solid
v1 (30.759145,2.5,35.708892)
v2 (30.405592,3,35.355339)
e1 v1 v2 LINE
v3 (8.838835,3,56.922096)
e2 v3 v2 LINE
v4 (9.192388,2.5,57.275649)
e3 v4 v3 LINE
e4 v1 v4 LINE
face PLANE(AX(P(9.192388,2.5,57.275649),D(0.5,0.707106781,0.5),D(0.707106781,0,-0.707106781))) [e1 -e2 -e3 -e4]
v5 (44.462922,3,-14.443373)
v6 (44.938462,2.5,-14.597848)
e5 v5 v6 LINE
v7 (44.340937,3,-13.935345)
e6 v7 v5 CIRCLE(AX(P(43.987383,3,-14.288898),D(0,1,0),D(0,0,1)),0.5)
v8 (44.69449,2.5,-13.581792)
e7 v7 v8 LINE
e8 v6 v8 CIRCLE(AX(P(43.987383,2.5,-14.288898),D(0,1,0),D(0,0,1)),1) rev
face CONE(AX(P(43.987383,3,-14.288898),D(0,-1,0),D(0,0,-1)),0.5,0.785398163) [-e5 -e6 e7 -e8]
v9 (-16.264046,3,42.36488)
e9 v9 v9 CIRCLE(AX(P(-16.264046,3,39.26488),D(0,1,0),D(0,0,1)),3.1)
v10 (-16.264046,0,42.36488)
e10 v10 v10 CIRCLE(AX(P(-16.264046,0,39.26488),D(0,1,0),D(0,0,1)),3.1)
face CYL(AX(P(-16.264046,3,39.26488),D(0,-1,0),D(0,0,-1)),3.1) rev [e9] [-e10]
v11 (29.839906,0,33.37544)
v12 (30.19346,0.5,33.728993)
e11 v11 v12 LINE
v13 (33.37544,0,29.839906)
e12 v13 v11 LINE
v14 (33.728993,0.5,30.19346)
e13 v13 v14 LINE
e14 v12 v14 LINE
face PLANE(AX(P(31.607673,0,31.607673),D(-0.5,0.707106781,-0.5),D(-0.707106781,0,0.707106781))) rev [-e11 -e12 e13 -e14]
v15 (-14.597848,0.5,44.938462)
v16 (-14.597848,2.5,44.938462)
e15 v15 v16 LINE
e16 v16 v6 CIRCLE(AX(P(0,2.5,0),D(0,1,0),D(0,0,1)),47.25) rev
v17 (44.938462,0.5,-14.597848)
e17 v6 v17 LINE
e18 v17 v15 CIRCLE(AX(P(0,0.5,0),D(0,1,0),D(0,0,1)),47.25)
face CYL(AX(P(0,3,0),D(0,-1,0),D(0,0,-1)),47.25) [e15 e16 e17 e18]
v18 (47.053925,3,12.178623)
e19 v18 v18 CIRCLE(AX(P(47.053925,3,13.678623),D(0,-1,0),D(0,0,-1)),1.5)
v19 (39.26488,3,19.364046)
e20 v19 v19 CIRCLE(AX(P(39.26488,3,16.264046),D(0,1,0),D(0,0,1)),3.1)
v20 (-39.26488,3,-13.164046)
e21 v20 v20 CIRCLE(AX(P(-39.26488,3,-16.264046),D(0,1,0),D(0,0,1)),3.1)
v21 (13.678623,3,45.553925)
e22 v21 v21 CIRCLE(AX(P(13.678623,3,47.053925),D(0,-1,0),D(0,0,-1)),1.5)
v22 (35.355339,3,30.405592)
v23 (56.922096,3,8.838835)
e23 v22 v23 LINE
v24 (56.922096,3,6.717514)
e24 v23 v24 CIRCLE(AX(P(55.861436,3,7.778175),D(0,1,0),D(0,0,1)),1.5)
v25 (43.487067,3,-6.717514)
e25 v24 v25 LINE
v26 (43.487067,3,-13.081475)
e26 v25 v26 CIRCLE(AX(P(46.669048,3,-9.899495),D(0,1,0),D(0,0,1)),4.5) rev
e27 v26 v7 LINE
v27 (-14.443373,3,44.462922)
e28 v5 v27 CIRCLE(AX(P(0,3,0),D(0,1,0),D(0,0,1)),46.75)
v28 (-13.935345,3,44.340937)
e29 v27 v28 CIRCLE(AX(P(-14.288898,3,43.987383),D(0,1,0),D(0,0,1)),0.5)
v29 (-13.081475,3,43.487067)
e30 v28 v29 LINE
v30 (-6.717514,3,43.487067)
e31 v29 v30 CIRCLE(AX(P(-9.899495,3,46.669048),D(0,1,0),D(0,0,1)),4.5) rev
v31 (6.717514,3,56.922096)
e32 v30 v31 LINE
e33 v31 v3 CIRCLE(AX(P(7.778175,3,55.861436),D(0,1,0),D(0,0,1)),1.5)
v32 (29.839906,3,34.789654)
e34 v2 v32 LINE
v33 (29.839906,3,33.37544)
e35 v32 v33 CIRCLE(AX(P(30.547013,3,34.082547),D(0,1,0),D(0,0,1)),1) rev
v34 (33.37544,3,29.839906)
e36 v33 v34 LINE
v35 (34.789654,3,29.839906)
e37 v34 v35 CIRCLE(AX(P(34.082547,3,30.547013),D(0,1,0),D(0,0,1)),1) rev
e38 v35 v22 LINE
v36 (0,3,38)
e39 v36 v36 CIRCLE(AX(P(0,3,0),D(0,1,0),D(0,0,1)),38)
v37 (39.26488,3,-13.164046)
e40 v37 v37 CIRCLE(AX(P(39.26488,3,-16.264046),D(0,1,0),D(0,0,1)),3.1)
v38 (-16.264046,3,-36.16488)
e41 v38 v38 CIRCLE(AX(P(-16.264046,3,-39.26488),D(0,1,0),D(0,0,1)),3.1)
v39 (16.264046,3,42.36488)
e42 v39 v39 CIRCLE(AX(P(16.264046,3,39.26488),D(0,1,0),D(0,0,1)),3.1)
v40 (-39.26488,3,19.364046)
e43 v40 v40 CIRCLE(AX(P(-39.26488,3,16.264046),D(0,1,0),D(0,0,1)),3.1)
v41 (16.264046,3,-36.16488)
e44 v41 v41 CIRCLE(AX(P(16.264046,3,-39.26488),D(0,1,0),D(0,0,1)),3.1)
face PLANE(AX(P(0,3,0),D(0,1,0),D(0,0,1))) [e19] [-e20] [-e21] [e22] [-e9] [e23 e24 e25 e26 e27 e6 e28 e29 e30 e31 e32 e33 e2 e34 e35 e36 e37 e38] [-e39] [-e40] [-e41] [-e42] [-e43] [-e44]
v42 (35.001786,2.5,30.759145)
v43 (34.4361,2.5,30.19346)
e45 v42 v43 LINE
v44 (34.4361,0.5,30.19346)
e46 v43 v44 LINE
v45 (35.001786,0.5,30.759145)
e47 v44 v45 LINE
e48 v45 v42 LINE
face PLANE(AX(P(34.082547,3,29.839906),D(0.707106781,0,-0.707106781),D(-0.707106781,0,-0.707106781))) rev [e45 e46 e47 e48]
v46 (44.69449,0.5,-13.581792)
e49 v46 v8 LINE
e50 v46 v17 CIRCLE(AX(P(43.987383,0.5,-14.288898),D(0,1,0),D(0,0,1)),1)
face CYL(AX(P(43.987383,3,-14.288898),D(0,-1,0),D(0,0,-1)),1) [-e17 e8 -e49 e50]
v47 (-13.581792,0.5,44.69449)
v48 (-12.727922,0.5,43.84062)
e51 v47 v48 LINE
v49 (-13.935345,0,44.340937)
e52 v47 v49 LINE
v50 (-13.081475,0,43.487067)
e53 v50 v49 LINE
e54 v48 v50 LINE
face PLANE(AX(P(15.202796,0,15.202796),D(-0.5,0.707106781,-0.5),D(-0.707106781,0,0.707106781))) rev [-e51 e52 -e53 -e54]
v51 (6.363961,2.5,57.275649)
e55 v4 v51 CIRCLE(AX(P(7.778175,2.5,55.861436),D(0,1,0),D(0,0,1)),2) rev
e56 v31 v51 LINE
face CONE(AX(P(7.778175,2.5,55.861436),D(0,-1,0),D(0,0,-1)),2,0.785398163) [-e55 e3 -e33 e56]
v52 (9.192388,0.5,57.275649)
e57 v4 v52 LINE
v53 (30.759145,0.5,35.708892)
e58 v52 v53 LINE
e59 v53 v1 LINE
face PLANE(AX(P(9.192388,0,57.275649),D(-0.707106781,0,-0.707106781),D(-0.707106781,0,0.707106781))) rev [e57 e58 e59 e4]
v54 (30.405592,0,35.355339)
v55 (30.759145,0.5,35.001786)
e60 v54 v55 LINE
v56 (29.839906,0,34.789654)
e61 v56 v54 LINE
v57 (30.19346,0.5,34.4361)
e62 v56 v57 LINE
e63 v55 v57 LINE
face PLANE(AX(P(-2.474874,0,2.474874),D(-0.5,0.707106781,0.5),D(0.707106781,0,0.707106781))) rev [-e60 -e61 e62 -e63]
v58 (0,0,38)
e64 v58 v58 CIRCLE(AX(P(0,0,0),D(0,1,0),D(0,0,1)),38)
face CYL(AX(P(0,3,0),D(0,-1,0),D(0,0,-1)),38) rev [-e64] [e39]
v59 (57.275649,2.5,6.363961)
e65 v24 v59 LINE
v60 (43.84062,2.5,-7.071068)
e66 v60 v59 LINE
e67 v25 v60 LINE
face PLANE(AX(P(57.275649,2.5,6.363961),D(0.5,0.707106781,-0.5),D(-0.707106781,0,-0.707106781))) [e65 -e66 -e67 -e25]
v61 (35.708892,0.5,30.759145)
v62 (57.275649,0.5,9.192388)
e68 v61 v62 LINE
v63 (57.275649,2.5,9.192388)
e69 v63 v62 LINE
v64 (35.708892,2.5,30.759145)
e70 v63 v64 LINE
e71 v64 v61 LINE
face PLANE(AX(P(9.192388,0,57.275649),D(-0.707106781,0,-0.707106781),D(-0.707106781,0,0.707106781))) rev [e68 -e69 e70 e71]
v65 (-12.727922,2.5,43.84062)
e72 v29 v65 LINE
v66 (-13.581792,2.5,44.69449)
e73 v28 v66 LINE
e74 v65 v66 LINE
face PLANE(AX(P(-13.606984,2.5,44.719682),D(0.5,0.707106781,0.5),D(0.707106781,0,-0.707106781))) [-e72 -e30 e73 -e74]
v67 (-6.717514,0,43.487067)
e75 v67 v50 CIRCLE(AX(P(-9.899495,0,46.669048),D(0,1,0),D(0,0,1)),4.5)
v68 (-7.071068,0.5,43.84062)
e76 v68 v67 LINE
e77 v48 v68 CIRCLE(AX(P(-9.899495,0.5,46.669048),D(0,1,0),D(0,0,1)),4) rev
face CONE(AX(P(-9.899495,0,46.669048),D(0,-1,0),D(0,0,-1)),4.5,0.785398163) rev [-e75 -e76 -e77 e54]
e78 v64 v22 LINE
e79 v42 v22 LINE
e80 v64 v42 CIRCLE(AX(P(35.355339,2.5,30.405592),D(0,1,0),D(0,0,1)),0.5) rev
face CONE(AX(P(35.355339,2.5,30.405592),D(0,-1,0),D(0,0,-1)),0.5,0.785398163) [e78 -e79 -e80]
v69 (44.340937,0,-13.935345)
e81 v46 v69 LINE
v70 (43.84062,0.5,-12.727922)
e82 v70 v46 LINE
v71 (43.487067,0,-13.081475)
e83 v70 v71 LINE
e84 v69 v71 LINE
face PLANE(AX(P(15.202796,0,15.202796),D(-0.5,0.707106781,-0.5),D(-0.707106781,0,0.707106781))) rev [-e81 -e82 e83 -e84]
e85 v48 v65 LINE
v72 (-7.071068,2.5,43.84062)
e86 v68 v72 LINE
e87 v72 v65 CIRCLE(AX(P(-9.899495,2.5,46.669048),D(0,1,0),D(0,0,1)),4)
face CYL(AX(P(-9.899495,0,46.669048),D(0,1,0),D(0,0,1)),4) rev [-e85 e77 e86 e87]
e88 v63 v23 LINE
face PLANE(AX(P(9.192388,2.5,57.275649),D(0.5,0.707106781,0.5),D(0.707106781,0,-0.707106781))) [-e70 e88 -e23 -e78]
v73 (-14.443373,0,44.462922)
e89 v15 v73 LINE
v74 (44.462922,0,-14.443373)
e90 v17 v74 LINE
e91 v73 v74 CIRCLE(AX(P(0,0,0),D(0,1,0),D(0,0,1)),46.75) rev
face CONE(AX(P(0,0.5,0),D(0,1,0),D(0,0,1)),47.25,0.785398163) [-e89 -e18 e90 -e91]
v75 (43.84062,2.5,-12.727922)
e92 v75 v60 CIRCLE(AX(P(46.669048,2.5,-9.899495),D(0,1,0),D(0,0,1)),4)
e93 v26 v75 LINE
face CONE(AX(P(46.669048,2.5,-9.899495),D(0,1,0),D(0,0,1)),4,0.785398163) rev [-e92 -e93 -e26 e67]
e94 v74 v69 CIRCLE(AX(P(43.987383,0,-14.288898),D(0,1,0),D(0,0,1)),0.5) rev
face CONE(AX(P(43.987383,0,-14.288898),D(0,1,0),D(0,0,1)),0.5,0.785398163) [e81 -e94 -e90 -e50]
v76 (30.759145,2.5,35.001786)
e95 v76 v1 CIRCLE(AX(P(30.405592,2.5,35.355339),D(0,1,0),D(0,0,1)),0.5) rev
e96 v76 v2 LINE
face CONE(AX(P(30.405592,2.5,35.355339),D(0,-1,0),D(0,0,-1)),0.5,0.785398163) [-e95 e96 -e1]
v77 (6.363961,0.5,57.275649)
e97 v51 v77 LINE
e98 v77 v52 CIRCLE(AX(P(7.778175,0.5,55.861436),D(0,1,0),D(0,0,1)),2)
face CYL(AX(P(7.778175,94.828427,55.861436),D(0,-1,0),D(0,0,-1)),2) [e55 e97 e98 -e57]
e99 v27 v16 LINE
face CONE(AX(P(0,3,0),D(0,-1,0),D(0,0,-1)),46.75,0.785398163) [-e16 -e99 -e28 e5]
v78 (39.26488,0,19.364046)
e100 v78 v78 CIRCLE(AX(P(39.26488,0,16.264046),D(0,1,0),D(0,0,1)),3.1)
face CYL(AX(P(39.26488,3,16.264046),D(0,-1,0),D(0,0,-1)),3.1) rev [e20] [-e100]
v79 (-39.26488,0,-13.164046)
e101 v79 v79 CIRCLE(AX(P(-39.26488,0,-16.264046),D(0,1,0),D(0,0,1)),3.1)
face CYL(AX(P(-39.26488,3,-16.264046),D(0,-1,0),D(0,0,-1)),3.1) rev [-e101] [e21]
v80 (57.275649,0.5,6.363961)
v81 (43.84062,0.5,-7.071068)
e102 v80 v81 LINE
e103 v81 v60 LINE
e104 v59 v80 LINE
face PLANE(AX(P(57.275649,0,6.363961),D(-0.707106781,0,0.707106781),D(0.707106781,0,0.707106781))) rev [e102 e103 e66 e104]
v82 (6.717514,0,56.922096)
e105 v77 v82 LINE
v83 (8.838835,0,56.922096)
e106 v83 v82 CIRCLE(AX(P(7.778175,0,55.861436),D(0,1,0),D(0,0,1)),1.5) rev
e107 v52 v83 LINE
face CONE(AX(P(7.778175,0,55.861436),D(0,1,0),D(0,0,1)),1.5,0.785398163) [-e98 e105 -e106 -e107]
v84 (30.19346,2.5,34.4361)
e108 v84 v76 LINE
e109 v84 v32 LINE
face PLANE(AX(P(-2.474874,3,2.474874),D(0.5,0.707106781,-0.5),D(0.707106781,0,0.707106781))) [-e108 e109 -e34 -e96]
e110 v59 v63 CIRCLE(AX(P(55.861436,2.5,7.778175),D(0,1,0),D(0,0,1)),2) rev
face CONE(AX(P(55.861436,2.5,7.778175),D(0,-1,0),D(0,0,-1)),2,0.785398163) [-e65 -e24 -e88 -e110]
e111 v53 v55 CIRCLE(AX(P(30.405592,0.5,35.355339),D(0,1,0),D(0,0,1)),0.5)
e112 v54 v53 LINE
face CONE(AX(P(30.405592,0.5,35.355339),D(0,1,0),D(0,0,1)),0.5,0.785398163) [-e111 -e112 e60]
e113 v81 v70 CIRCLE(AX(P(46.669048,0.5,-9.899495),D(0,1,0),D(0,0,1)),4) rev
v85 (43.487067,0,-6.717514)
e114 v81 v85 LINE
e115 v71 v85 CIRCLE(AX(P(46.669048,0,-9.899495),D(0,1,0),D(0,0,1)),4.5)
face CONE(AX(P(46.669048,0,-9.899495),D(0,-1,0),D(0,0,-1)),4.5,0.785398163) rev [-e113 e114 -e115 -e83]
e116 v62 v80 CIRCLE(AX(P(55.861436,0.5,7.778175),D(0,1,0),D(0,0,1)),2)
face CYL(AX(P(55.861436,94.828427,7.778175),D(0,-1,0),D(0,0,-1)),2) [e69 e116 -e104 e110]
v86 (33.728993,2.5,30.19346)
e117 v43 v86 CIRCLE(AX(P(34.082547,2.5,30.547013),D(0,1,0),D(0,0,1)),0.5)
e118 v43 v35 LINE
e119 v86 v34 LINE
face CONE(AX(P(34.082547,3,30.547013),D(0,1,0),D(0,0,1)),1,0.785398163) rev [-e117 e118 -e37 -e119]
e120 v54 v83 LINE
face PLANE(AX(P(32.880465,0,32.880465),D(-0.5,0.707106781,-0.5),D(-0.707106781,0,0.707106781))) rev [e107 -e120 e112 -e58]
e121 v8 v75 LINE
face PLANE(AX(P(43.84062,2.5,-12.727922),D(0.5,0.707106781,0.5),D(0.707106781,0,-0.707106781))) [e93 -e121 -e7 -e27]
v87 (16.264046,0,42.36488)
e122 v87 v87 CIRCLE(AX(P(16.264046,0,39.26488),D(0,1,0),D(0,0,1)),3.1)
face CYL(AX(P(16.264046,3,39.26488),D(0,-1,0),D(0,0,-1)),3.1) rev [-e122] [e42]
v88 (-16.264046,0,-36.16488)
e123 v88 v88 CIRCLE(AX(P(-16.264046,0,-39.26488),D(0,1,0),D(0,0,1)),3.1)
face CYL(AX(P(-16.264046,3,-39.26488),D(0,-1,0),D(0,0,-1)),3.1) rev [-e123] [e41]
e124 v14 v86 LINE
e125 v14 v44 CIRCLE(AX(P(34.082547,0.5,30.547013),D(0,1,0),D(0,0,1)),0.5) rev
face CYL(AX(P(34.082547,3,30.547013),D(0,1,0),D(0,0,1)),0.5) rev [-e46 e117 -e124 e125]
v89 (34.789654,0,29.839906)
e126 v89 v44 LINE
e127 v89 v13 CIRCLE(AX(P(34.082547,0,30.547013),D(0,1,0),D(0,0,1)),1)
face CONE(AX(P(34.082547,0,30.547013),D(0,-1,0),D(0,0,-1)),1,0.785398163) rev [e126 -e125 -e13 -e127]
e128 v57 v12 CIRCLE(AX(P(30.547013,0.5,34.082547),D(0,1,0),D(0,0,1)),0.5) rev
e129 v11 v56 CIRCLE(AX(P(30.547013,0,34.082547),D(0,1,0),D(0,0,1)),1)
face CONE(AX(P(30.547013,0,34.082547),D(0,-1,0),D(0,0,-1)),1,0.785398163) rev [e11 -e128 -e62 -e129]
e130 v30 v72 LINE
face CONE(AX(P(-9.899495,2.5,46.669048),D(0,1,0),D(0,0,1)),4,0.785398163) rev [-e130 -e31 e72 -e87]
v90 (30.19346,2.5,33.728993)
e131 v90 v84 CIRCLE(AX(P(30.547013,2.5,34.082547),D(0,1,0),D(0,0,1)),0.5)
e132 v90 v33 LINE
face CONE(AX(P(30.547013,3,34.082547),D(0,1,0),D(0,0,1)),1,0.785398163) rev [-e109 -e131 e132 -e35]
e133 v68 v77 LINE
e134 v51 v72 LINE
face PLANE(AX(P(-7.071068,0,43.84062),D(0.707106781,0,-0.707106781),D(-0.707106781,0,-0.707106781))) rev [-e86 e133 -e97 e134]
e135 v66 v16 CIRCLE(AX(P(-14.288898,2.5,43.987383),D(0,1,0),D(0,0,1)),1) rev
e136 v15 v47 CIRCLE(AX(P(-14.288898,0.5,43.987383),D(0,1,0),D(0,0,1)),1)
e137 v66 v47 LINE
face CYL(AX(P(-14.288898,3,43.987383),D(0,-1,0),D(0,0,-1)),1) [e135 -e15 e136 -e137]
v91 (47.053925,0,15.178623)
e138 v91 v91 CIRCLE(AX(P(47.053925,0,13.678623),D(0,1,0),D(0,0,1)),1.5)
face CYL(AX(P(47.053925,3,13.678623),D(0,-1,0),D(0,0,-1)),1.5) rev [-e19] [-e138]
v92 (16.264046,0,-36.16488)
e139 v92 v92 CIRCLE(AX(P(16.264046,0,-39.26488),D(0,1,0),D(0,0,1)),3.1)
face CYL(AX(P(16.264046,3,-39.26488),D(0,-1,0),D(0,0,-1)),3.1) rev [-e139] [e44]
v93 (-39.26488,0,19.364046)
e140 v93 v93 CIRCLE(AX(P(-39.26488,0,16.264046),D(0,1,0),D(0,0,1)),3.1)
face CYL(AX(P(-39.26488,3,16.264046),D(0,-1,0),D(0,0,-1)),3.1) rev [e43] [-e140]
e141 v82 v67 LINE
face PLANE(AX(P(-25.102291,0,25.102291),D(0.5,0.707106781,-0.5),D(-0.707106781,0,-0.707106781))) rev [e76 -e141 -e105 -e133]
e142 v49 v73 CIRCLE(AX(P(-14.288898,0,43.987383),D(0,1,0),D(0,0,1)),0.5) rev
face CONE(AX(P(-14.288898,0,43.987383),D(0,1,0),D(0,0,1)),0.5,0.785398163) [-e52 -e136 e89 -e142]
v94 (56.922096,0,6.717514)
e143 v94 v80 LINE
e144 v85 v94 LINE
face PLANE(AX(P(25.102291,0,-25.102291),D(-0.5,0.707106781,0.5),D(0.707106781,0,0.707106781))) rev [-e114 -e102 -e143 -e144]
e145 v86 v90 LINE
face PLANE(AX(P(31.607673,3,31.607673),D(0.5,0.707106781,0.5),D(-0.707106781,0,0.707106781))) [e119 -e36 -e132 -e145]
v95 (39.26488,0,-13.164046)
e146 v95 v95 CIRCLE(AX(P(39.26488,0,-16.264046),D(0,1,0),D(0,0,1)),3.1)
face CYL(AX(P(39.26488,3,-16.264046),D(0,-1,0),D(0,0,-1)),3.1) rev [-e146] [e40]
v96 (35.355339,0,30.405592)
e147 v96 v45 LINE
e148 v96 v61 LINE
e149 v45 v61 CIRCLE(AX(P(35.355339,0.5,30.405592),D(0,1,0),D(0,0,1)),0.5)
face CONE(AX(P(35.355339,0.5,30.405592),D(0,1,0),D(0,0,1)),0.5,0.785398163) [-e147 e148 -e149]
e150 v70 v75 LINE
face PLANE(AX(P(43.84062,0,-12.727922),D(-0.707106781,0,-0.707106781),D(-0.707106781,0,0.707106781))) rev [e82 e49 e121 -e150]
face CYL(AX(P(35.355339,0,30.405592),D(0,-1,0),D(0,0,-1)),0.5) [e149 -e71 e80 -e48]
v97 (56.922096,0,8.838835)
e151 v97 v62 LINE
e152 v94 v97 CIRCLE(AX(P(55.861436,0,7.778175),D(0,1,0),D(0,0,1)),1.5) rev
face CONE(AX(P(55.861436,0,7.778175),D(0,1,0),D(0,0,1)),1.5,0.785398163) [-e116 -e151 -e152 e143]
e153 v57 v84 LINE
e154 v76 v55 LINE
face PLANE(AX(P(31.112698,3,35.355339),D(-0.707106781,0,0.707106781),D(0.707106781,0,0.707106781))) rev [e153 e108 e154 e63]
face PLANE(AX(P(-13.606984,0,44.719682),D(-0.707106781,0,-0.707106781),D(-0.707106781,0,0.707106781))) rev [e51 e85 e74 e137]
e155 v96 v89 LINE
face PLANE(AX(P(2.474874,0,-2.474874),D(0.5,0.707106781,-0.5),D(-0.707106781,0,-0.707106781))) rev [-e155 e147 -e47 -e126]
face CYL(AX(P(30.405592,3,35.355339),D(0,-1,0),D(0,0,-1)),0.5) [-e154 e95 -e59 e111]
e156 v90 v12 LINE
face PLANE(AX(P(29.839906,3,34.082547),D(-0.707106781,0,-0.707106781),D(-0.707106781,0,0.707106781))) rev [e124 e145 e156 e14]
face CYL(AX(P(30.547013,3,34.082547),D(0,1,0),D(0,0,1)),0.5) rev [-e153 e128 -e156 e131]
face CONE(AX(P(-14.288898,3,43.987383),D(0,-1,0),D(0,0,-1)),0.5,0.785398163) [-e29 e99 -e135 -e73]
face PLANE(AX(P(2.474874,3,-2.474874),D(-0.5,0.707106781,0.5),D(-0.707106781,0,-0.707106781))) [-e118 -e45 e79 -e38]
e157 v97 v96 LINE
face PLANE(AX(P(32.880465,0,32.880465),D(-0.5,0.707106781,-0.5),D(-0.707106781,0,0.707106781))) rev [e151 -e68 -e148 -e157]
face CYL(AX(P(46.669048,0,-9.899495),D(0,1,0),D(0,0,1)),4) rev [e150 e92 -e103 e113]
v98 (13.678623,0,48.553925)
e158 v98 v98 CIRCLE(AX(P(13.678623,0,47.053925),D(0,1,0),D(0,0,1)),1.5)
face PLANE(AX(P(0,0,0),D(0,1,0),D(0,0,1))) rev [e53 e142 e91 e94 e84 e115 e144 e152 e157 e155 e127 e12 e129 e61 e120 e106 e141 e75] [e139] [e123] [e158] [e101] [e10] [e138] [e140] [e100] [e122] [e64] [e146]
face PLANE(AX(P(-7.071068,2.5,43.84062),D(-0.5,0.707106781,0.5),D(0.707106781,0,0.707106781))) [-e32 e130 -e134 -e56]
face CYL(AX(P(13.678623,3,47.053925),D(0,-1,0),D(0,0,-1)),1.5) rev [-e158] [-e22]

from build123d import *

# Parameters (mm, degrees)
SKETCH_1_R               = 47.25
SKETCH_1_R_2             = 38
SKETCH_1_R_3             = 3.1
EXTRUDE_1_DEPTH          = 3
CUT_EXTRUDE_1_DEPTH      = 67.888900425
CUT_EXTRUDE_1_DEPTH_BACK = 67.888900425
EXTRUDE_2_DEPTH          = 3
FILLET_1_R               = 1
CUT_EXTRUDE_2_DEPTH      = 82.883401917
CUT_EXTRUDE_2_DEPTH_BACK = 82.883401917
FILLET_2_R               = 0.5
CHAMFER_1_SIZE           = 0.5
CUT_EXTRUDE_3_DEPTH      = 82.883401775
CUT_EXTRUDE_3_DEPTH_BACK = 82.883401775
SKETCH_7_R               = 1.5
CUT_EXTRUDE_4_DEPTH      = 82.883401775
CUT_EXTRUDE_4_DEPTH_BACK = 82.883401775
SKETCH_8_R               = 1.5


with BuildPart() as part:
    # 草图1 → 凸台-拉伸1 (new body)
    with BuildSketch(Plane(origin=(0, 0, 0), x_dir=(1, 0, 0), z_dir=(0, 1, 0))):
        with Locations(Location((0, 0, 0), (0, 0, 270))):
            Circle(SKETCH_1_R)
        with Locations(Location((0, 0, 0), (0, 0, 270))):
            Circle(SKETCH_1_R_2, mode=Mode.SUBTRACT)
        with Locations(Location((-16.264045876, 39.264880132, 0), (0, 0, 270))):
            Circle(SKETCH_1_R_3, mode=Mode.SUBTRACT)
        with Locations(Location((16.264045876, 39.264880132, 0), (0, 0, 270))):
            Circle(SKETCH_1_R_3, mode=Mode.SUBTRACT)
        with Locations(Location((39.264880132, 16.264045876, 0), (0, 0, 270))):
            Circle(SKETCH_1_R_3, mode=Mode.SUBTRACT)
        with Locations(Location((39.264880132, -16.264045876, 0), (0, 0, 270))):
            Circle(SKETCH_1_R_3, mode=Mode.SUBTRACT)
        with Locations(Location((16.264045876, -39.264880132, 0), (0, 0, 270))):
            Circle(SKETCH_1_R_3, mode=Mode.SUBTRACT)
        with Locations(Location((-16.264045876, -39.264880132, 0), (0, 0, 270))):
            Circle(SKETCH_1_R_3, mode=Mode.SUBTRACT)
        with Locations(Location((-39.264880132, -16.264045876, 0), (0, 0, 270))):
            Circle(SKETCH_1_R_3, mode=Mode.SUBTRACT)
        with Locations(Location((-39.264880132, 16.264045876, 0), (0, 0, 270))):
            Circle(SKETCH_1_R_3, mode=Mode.SUBTRACT)
    extrude(amount=EXTRUDE_1_DEPTH)

    # 草图4 → 切除-拉伸1 (cut, two sides: drawn at the far end of the back side and taken through both)
    with BuildSketch(Plane(origin=(0, 3, 0), x_dir=(1, 0, 0), z_dir=(0, 1, 0)).offset(-CUT_EXTRUDE_1_DEPTH_BACK)):
        with BuildLine():
            Line((43.840620434, 12.727922061), (44.719682329, 13.606983957))
            ThreePointArc((44.719682329, 13.606983957), (45.806880456, 15.618172507), (45.614922333, 17.896336511))
            Line((45.614922333, 17.896336511), (84.379499133, 11.829199362))
            Line((84.379499133, 11.829199362), (6.001901693, -69.182953765))
            Line((6.001901693, -69.182953765), (-17.896336511, -45.614922333))
            ThreePointArc((-17.896336511, -45.614922333), (-15.618172507, -45.806880456), (-13.606983957, -44.719682329))
            Line((-13.606983957, -44.719682329), (-12.727922061, -43.840620434))
            ThreePointArc((-12.727922061, -43.840620434), (-9.899494937, -42.669047558), (-7.071067812, -43.840620434))
            Line((-7.071067812, -43.840620434), (6.363961031, -57.275649276))
            ThreePointArc((6.363961031, -57.275649276), (7.778174593, -57.861435714), (9.192388155, -57.275649276))
            Line((9.192388155, -57.275649276), (57.275649276, -9.192388155))
            ThreePointArc((57.275649276, -9.192388155), (57.861435714, -7.778174593), (57.275649276, -6.363961031))
            Line((57.275649276, -6.363961031), (43.840620434, 7.071067812))
            ThreePointArc((43.840620434, 7.071067812), (42.669047558, 9.899494937), (43.840620434, 12.727922061))
        make_face()
    extrude(amount=CUT_EXTRUDE_1_DEPTH + CUT_EXTRUDE_1_DEPTH_BACK, mode=Mode.SUBTRACT)

    # 草图5 → 凸台-拉伸2 (add)
    with BuildSketch(Plane.XZ):
        with BuildLine():
            Line((57.275649276, 6.363961031), (43.840620434, -7.071067812))
            ThreePointArc((43.840620434, -7.071067812), (33.021886933, 33.021886933), (-7.071067812, 43.840620434))
            Line((-7.071067812, 43.840620434), (6.363961031, 57.275649276))
            ThreePointArc((6.363961031, 57.275649276), (7.778174593, 57.861435714), (9.192388155, 57.275649276))
            Line((9.192388155, 57.275649276), (57.275649276, 9.192388155))
            ThreePointArc((57.275649276, 9.192388155), (57.861435714, 7.778174593), (57.275649276, 6.363961031))
        make_face()
    extrude(amount=-EXTRUDE_2_DEPTH)

    # 圆角1
    fillet_1_edges = [part.edges().sort_by_distance(p)[0] for p in [
        (45.109607697, 1.5, -14.060078003),
        (-14.060078003, 1.5, 45.109607697),
    ]]
    fillet(fillet_1_edges, radius=FILLET_1_R)

    # 草图6 → 切除-拉伸2 (cut, two sides: drawn at the far end of the back side and taken through both)
    with BuildSketch(Plane.XZ.offset(-CUT_EXTRUDE_2_DEPTH_BACK)):
        Polygon((29.839906166, 34.082546853), (34.082546853, 29.839906166), (35.355339059, 31.112698372), (31.112698372, 35.355339059), align=None)
    extrude(amount=CUT_EXTRUDE_2_DEPTH + CUT_EXTRUDE_2_DEPTH_BACK, mode=Mode.SUBTRACT)

    # 圆角2
    fillet_2_edges = [part.edges().sort_by_distance(p)[0] for p in [
        (34.082546853, 1.5, 29.839906166),
        (31.112698372, 1.5, 35.355339059),
        (35.355339059, 1.5, 31.112698372),
        (29.839906166, 1.5, 34.082546853),
    ]]
    fillet(fillet_2_edges, radius=FILLET_2_R)

    # 倒角1
    chamfer_1_edges = [part.edges().sort_by_distance(p)[0] for p in [
        (57.861435714, 0, 7.778174593),
        (7.778174593, 0, 57.861435714),
        (7.778174593, 3, 57.861435714),
        (57.861435714, 3, 7.778174593),
        (-33.410795411, 3, -33.410795411),
        (-33.410795411, 0, -33.410795411),
        (44.267555216, 0, -13.154856844),
        (-14.055418364, 0, 44.959744811),
        (44.959744811, 0, -14.055418364),
        (44.267555216, 3, -13.154856844),
        (-14.055418364, 3, 44.959744811),
        (44.959744811, 3, -14.055418364),
        (34.718942956, 0, 30.476302269),
        (31.96122651, 0, 31.96122651),
        (30.476302269, 0, 34.718942956),
        (19.975766569, 0, 46.492270863),
        (30.905591591, 0, 35.355339059),
        (35.355339059, 0, 30.905591591),
        (34.718942956, 3, 30.476302269),
        (19.975766569, 3, 46.492270863),
        (30.476302269, 3, 34.718942956),
        (31.96122651, 3, 31.96122651),
        (30.905591591, 3, 35.355339059),
        (35.355339059, 3, 30.905591591),
        (34.082546853, 0, 30.047012947),
        (34.082546853, 3, 30.047012947),
        (30.047012947, 0, 34.082546853),
        (30.047012947, 3, 34.082546853),
        (-0.353553391, 3, 50.558134855),
        (46.492270863, 0, 19.975766569),
        (50.558134855, 3, -0.353553391),
        (-13.154856844, 0, 44.267555216),
        (-9.899494937, 0, 42.669047558),
        (-0.353553391, 0, 50.558134855),
        (46.492270863, 3, 19.975766569),
        (50.558134855, 0, -0.353553391),
        (42.669047558, 0, -9.899494937),
        (42.669047558, 3, -9.899494937),
        (-9.899494937, 3, 42.669047558),
        (-13.154856844, 3, 44.267555216),
    ]]
    chamfer(chamfer_1_edges, length=CHAMFER_1_SIZE - 0.0001)  # a hair under: the kernel refuses the full size

    # 草图7 → 切除-拉伸3 (cut, two sides: drawn at the far end of the back side and taken through both)
    with BuildSketch(Plane.XZ.offset(-CUT_EXTRUDE_3_DEPTH_BACK)):
        with Locations(Location((13.678623105, 47.053925479, 0), (0, 0, 270))):
            Circle(SKETCH_7_R)
    extrude(amount=CUT_EXTRUDE_3_DEPTH + CUT_EXTRUDE_3_DEPTH_BACK, mode=Mode.SUBTRACT)

    # 草图8 → 切除-拉伸4 (cut, two sides: drawn at the far end of the back side and taken through both)
    with BuildSketch(Plane.XZ.offset(-CUT_EXTRUDE_4_DEPTH_BACK)):
        with Locations(Location((47.053925479, 13.678623105, 0), (0, 0, 270))):
            Circle(SKETCH_8_R)
    extrude(amount=CUT_EXTRUDE_4_DEPTH + CUT_EXTRUDE_4_DEPTH_BACK, mode=Mode.SUBTRACT)


solid = part.part
